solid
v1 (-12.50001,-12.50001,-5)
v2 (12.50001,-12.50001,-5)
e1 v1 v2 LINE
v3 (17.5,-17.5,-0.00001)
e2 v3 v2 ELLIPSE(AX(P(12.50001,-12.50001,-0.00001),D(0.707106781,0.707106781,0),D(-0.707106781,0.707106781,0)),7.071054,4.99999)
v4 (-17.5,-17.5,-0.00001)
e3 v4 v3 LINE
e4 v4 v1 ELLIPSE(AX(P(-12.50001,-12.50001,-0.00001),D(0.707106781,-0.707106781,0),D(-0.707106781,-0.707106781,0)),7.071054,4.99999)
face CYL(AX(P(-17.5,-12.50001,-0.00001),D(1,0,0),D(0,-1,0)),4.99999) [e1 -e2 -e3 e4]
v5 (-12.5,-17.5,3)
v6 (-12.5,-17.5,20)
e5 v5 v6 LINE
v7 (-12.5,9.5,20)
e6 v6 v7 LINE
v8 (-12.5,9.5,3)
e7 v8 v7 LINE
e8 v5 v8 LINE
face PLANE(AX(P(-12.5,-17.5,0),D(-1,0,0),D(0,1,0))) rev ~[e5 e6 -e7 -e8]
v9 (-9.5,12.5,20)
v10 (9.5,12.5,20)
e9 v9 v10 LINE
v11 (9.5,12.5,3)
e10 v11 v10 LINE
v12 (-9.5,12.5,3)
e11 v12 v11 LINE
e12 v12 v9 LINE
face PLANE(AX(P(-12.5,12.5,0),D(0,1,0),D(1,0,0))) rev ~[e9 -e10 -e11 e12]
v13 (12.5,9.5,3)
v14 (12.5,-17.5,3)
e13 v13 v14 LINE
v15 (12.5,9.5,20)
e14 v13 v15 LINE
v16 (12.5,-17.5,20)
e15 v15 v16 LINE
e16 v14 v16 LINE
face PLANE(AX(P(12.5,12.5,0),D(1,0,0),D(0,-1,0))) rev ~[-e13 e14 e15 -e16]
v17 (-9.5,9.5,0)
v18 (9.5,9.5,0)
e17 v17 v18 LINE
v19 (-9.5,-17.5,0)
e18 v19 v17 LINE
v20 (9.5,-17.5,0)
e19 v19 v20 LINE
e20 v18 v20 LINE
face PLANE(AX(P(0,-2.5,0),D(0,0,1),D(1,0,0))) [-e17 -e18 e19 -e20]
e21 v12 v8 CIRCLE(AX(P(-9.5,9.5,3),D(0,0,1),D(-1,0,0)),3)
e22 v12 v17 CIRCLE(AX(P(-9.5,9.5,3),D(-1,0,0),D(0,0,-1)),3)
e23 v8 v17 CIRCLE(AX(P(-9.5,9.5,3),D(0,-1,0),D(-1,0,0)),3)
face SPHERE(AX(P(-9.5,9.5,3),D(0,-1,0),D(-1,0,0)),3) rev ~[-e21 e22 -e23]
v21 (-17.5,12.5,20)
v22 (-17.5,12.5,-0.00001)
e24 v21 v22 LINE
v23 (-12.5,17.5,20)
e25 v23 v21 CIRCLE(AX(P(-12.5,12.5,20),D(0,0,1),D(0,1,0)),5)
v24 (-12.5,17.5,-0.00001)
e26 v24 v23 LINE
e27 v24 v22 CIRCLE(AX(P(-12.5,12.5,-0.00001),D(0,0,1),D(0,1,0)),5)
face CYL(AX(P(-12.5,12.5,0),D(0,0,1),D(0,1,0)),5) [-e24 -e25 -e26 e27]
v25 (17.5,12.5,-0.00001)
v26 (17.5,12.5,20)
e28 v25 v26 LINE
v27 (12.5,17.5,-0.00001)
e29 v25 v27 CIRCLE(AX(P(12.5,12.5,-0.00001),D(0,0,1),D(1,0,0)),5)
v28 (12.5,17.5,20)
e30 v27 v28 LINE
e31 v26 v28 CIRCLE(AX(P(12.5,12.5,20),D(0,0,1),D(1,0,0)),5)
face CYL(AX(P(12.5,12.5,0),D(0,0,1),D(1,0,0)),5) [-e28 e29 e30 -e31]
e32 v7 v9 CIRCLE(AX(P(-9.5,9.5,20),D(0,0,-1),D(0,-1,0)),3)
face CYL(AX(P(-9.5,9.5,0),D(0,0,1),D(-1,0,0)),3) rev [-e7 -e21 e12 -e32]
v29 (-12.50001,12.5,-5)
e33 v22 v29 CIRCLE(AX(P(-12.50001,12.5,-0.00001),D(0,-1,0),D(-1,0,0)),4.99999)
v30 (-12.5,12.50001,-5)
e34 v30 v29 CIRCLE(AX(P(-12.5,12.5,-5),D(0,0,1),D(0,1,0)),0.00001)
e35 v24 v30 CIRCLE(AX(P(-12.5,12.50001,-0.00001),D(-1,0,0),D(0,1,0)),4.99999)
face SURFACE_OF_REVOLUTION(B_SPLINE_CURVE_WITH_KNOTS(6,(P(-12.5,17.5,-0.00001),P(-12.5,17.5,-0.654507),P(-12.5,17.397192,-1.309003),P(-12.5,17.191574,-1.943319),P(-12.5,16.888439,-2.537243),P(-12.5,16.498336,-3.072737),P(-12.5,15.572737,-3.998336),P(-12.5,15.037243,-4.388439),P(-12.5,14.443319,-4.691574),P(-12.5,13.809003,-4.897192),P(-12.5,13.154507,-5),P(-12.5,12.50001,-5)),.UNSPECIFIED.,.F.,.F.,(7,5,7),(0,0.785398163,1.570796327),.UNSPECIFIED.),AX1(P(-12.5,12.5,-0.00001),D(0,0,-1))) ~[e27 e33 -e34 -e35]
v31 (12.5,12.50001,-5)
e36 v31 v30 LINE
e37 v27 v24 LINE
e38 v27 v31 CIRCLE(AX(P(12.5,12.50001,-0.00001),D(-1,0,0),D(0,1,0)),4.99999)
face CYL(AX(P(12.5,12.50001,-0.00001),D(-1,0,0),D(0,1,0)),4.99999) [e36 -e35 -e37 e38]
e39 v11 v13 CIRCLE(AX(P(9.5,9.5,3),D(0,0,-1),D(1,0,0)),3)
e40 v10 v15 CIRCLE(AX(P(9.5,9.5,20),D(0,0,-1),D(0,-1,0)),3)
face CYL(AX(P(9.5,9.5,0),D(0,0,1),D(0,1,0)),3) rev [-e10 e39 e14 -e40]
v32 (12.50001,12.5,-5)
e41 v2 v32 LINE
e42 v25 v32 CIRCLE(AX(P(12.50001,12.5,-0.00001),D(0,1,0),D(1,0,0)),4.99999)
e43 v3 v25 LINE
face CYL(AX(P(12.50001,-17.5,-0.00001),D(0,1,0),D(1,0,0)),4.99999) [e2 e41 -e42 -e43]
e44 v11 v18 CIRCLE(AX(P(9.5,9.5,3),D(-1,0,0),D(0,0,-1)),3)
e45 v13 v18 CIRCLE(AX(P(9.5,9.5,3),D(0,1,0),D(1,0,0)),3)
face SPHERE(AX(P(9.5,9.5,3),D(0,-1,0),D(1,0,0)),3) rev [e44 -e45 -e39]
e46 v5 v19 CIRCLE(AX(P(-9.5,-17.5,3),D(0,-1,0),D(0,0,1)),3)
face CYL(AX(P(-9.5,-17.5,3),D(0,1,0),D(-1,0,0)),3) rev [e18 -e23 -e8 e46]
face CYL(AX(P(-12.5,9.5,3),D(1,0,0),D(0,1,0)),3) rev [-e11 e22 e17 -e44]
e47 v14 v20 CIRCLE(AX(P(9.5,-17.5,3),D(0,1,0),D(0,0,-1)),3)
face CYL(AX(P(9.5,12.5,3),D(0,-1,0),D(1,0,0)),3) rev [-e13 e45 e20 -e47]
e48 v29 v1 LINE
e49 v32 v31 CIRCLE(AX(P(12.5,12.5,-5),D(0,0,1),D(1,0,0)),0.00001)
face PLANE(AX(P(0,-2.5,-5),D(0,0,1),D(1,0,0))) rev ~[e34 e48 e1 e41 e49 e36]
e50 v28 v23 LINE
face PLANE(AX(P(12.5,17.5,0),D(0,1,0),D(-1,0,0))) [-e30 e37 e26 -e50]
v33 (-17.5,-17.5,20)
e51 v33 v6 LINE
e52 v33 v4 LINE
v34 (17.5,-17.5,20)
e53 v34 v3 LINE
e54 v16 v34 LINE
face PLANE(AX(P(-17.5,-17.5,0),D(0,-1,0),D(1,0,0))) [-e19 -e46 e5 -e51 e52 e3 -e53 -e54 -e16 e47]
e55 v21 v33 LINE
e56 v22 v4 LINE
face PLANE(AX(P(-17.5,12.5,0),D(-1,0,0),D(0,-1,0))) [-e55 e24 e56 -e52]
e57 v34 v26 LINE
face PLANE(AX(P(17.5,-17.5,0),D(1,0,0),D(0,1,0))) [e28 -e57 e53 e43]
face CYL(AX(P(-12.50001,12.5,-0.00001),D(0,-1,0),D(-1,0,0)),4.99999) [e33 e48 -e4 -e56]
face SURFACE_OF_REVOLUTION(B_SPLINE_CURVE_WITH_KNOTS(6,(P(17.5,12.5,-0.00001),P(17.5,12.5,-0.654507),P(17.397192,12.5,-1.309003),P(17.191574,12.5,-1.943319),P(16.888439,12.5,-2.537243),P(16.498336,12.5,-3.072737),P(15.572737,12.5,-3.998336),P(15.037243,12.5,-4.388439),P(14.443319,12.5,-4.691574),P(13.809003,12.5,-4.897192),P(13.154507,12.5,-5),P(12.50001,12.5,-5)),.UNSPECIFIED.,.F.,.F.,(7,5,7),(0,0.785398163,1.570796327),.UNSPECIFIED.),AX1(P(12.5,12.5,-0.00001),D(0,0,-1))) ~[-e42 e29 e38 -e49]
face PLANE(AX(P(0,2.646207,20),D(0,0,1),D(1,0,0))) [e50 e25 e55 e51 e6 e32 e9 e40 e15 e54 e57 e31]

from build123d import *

# Parameters (mm, degrees)
F1_DEPTH = 20
F0_W     = 25
F0_H     = 30
F2_DEPTH = 5
F3_R     = 4.99999
F4_R     = 3


# Not quite as in the source:
# - a fillet or chamfer is up to 0.001 mm smaller than in the source, because OpenCascade refuses the exact size


with BuildPart() as f1:
    # F0 (on Top) → F1 (new body)
    with BuildSketch(Plane.XY):
        with BuildLine():
            Line((12.5, -17.5), (17.5, -17.5))
            Line((17.5, -17.5), (17.5, 12.5))
            ThreePointArc((17.5, 12.5), (16.0355339059, 16.0355339059), (12.5, 17.5))
            Line((12.5, 17.5), (-12.5, 17.5))
            ThreePointArc((-12.5, 17.5), (-16.0355339059, 16.0355339059), (-17.5, 12.5))
            Line((-17.5, 12.5), (-17.5, -17.5))
            Line((-17.5, -17.5), (-12.5, -17.5))
            Line((-12.5, -17.5), (-12.5, 12.5))
            Line((-12.5, 12.5), (12.5, 12.5))
            Line((12.5, 12.5), (12.5, -17.5))
        make_face()
    extrude(amount=F1_DEPTH)

    # F0 (on Top) → F2 (join)
    with BuildSketch(Plane.XY):
        with Locations((0, -2.5)):
            Rectangle(F0_W, F0_H)
        with BuildLine():
            Line((12.5, -17.5), (17.5, -17.5))
            Line((17.5, -17.5), (17.5, 12.5))
            ThreePointArc((17.5, 12.5), (16.0355339059, 16.0355339059), (12.5, 17.5))
            Line((12.5, 17.5), (-12.5, 17.5))
            ThreePointArc((-12.5, 17.5), (-16.0355339059, 16.0355339059), (-17.5, 12.5))
            Line((-17.5, 12.5), (-17.5, -17.5))
            Line((-17.5, -17.5), (-12.5, -17.5))
            Line((-12.5, -17.5), (-12.5, 12.5))
            Line((-12.5, 12.5), (12.5, 12.5))
            Line((12.5, 12.5), (12.5, -17.5))
        make_face()
    extrude(amount=-F2_DEPTH)

    # F3 (radius 5 in the source; OpenCascade refuses exactly that, so slightly less here)
    f3_edges = [f1.edges().sort_by_distance(p)[0] for p in [
        (17.5, -2.5, -5),
        (16.035534, 16.035534, -5),
        (0, 17.5, -5),
        (-16.035534, 16.035534, -5),
        (-17.5, -2.5, -5),
        (0, -17.5, -5),
    ]]
    fillet(f3_edges, radius=F3_R)

    # F4
    f4_edges = [f1.edges().sort_by_distance(p)[0] for p in [
        (12.5, -2.5, 0),
        (-12.5, -2.5, 0),
        (12.5, 12.5, 10),
        (-12.5, 12.5, 10),
        (0, 12.5, 0),
    ]]
    fillet(f4_edges, radius=F4_R)


solid = f1.part
